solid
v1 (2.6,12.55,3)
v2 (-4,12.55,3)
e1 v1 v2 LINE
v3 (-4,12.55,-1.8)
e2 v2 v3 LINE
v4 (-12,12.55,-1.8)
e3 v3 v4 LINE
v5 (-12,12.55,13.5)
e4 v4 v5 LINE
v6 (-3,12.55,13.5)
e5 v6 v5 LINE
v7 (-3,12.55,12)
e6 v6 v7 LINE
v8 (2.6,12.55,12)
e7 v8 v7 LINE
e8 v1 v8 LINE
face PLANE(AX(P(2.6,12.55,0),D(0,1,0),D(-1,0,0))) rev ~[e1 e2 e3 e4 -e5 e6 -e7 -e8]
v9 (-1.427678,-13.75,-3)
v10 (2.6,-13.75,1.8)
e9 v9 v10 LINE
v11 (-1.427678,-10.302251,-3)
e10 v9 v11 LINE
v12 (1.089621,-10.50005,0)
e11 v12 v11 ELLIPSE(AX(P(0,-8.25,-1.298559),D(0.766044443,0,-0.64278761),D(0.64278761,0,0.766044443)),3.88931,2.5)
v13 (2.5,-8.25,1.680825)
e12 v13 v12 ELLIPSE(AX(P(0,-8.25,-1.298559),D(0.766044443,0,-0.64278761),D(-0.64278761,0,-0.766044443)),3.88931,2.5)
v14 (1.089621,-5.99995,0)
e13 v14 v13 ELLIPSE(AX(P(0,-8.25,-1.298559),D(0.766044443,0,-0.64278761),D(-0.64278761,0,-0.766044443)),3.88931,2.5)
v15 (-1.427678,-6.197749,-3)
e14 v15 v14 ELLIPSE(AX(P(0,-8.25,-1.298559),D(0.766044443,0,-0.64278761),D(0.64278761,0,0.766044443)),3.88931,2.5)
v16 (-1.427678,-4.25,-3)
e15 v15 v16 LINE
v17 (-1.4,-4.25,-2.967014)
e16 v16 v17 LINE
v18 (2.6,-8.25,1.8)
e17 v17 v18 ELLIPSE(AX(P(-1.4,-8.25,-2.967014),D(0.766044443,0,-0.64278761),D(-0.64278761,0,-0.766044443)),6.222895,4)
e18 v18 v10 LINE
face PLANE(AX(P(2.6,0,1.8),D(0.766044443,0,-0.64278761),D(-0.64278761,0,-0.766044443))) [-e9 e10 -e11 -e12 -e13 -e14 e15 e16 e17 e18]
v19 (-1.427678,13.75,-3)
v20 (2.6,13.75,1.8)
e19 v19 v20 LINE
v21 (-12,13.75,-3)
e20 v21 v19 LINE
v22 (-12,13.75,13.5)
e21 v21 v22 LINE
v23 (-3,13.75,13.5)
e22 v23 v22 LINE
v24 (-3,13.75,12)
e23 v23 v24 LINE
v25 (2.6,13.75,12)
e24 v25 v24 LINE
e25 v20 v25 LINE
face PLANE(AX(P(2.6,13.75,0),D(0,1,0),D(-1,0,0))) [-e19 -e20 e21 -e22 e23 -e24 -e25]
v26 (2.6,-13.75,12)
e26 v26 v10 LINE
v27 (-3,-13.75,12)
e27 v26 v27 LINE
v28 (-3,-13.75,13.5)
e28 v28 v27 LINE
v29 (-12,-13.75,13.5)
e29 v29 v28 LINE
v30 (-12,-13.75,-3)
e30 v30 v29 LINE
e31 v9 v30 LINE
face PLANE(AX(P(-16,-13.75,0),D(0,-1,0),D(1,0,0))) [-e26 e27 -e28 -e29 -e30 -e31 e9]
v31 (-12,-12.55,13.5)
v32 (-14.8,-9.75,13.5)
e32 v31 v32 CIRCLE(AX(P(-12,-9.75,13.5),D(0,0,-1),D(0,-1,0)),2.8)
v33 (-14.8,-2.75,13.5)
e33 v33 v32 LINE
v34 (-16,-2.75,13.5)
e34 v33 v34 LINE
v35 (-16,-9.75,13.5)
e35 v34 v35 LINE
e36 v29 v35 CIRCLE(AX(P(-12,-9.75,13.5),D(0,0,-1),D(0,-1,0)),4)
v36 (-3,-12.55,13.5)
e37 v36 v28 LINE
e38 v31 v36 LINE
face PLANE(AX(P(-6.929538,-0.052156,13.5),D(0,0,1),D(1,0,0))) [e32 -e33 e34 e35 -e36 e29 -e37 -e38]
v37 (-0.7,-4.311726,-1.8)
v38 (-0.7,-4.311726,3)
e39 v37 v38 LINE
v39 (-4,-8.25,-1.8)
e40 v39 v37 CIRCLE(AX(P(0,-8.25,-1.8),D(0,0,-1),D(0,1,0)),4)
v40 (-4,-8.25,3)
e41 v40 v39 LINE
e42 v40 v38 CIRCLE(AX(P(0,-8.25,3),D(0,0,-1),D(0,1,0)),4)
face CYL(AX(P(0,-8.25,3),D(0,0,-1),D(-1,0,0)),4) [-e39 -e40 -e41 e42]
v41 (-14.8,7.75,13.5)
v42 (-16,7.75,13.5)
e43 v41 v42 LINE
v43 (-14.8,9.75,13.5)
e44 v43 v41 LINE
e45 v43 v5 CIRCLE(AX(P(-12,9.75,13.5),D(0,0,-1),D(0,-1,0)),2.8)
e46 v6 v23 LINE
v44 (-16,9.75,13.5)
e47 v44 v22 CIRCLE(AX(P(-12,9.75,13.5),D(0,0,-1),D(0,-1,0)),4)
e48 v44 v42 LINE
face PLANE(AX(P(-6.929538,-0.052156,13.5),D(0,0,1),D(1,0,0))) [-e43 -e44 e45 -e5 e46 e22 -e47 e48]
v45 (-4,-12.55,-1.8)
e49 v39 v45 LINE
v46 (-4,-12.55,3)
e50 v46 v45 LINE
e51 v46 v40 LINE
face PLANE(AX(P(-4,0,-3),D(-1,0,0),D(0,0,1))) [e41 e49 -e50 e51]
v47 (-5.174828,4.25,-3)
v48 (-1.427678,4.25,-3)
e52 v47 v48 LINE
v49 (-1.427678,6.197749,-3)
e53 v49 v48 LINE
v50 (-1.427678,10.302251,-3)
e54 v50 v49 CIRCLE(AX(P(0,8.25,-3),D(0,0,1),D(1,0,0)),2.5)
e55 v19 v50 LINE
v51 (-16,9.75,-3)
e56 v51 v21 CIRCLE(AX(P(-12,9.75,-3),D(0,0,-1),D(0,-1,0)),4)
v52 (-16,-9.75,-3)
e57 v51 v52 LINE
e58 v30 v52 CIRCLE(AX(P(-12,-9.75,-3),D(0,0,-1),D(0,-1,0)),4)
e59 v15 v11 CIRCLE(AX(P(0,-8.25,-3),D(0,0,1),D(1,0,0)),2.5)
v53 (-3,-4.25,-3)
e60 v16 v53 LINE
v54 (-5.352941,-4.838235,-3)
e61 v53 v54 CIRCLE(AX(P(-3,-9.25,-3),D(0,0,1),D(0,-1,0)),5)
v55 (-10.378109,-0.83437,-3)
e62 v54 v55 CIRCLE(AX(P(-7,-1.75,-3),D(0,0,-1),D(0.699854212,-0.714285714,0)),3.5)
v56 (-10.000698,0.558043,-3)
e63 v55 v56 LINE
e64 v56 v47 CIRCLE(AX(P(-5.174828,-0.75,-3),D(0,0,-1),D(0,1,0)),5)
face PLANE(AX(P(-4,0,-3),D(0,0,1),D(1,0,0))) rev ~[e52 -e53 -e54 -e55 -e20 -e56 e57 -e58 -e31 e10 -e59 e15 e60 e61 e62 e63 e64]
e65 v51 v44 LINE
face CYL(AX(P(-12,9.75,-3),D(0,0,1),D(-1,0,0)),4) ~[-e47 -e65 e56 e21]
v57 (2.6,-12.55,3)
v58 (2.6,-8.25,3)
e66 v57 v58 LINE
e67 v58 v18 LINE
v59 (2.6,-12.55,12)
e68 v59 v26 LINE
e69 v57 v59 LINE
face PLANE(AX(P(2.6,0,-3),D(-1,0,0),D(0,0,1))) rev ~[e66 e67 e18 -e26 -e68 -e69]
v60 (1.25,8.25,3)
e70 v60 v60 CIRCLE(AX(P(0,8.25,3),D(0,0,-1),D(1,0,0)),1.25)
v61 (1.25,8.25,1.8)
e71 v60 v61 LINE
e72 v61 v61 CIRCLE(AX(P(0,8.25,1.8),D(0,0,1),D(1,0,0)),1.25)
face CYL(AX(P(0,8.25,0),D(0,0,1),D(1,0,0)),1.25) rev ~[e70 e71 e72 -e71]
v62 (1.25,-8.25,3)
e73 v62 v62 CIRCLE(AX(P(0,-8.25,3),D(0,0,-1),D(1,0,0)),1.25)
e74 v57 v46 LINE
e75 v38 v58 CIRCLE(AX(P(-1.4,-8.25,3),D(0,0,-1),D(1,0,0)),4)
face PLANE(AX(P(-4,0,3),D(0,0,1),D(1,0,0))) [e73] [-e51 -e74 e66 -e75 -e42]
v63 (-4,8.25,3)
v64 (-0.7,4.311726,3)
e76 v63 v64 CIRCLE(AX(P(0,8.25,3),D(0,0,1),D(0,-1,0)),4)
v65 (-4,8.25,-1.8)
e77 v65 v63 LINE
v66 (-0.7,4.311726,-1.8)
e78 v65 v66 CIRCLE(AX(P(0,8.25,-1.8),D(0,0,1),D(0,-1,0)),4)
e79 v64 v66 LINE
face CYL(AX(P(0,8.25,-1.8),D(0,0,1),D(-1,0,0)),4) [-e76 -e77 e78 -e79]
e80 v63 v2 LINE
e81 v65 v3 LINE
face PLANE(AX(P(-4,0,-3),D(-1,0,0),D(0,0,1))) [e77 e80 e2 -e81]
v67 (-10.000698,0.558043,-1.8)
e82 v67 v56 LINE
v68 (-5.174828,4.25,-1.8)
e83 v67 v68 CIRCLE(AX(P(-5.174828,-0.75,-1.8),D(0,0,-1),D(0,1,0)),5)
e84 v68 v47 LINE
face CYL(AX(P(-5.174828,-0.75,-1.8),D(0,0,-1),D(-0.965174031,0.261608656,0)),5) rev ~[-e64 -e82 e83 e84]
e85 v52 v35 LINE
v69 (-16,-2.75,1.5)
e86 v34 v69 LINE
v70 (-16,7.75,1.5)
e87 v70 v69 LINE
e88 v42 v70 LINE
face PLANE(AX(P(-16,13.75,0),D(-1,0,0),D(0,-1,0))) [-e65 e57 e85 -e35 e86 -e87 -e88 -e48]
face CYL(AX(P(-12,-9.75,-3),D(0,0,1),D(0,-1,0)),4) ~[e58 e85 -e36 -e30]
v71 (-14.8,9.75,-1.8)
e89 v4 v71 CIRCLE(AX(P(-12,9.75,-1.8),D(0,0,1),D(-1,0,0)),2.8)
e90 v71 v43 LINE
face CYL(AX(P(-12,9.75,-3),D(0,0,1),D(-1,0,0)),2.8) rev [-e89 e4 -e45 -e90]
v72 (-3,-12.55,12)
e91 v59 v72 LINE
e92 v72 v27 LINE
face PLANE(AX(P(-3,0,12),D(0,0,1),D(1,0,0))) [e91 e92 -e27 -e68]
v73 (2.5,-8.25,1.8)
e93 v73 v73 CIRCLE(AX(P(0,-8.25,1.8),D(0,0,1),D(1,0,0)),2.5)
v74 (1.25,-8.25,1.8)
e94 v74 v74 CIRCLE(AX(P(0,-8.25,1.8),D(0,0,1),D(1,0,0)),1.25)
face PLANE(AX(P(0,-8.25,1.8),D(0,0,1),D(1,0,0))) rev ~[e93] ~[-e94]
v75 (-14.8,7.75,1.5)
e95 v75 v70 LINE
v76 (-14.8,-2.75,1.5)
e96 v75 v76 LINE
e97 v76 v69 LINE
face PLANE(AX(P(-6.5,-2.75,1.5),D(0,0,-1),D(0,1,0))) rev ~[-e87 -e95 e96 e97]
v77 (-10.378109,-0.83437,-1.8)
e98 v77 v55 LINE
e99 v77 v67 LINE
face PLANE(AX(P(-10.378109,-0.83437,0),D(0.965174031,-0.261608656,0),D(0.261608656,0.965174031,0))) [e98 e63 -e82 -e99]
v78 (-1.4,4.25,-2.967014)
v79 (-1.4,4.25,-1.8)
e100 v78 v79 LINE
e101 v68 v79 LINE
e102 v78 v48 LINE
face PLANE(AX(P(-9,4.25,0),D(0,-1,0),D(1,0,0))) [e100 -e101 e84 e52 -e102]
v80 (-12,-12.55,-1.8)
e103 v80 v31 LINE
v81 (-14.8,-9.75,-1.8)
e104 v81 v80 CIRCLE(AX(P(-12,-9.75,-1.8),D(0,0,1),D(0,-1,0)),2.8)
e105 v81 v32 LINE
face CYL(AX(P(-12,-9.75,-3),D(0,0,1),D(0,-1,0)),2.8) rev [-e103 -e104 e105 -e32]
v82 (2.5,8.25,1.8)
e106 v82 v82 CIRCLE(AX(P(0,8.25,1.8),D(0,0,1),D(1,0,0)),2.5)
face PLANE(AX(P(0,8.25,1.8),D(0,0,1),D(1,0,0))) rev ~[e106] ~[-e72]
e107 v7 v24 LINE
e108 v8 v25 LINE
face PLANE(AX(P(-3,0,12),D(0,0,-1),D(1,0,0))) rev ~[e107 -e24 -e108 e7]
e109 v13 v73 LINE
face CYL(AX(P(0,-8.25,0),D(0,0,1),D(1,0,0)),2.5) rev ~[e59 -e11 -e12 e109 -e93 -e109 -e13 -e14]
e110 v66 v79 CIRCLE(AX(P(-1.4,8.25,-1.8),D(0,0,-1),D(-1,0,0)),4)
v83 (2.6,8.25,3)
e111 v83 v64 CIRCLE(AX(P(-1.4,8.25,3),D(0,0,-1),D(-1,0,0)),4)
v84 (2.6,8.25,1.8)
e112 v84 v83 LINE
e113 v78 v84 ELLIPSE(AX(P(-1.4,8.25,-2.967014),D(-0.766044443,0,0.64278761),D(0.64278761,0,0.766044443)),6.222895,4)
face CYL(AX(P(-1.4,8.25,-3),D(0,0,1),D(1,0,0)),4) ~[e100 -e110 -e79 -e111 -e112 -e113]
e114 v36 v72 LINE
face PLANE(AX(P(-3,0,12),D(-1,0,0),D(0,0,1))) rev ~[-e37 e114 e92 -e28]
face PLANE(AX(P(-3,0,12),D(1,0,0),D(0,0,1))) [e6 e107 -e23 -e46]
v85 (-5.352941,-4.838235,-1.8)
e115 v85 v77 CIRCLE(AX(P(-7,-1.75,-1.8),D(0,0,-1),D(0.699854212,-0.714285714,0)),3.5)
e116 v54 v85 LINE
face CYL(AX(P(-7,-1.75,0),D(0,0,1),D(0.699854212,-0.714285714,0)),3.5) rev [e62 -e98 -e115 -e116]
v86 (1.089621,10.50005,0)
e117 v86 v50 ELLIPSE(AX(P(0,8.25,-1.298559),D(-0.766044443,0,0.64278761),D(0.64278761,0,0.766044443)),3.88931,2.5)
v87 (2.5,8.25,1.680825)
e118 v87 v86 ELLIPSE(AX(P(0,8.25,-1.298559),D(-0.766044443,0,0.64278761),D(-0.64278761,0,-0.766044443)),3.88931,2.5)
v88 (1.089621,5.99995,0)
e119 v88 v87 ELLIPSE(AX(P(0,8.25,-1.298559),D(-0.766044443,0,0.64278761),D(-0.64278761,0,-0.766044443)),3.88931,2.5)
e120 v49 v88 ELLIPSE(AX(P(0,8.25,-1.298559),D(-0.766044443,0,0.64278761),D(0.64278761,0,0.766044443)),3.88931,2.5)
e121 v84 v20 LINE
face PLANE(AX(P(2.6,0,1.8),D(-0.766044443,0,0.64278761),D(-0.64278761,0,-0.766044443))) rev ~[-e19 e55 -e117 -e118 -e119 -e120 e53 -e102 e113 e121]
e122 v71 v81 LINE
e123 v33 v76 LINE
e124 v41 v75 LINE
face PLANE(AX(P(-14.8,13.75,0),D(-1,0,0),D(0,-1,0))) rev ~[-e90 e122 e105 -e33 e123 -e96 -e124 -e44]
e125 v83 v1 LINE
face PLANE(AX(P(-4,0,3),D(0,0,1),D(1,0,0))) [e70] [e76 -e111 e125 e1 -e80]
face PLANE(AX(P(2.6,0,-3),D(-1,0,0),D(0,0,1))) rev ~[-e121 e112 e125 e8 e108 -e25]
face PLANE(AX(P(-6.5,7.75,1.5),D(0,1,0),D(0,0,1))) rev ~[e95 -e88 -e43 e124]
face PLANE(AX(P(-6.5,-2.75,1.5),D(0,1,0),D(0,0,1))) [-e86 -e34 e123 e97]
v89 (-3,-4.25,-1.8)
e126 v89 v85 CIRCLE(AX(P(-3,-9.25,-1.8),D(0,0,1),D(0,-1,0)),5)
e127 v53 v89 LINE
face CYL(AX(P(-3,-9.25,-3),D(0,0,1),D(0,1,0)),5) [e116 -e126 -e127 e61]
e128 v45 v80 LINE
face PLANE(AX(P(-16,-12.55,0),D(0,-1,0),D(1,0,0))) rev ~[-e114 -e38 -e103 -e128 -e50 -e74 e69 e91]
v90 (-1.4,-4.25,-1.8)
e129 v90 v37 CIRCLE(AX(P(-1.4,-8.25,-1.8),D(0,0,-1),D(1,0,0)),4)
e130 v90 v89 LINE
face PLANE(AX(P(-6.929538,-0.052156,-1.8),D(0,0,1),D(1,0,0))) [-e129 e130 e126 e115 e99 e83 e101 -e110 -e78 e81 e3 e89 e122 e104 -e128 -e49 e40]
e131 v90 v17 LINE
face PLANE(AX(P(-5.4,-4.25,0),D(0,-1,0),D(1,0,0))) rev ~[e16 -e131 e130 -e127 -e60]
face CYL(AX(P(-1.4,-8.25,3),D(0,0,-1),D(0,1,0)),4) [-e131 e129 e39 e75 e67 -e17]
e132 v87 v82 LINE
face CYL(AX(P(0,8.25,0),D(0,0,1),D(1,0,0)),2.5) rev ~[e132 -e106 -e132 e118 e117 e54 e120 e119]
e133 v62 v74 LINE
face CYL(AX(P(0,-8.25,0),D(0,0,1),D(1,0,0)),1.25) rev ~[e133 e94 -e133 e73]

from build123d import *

# Parameters (mm, degrees)
F4_DEPTH       = 13.5
F4_DEPTH_BACK  = 3
F5_R           = 4
F6_T           = -1.2
F7_W           = 6.6
F7_H           = 6
F8_DEPTH       = 13.75
F8_DEPTH_BACK  = 13.75
F3_W           = 8
F3_H           = 8.5
F9_DEPTH       = 4.5
F9_DEPTH_BACK  = 4.3
F11_START      = -6.5
F10_W          = 10.5
F10_H          = 18.4398862173
F11_DEPTH      = 11.4
F12_F1_R       = 4
F12_F2_R       = 4
F12_F3_R       = 4
F12_F4_R       = 4
F0_R           = 1.25
F13_DEPTH      = 7.9
F13_DEPTH_BACK = 7.1
F1_R           = 2.5
F14_DEPTH      = 1.8
F14_DEPTH_BACK = 4.3
F15_R          = 5
F17_DEPTH      = 16
F17_DEPTH_BACK = 16.1
F18_W          = 5.6
F18_H          = 3
F19_DEPTH      = 25
F19_DEPTH_BACK = 25


# Not quite as in the source:
# - a feature names something its author has since deleted; it is built from what else it names


with BuildPart() as f4:
    # F2 (on Top) → F4 (new body, two sides)
    with BuildSketch(Plane.XY) as f4_sk:
        with BuildLine():
            Line((2.6, 4.25), (2.6, 13.75))
            Line((2.6, 13.75), (-16, 13.75))
            Line((-16, 13.75), (-16, -13.75))
            Line((-16, -13.75), (2.6, -13.75))
            Line((2.6, -13.75), (2.6, -4.25))
            Line((2.6, -4.25), (-4.5505102572, -4.25))
            ThreePointArc((-4.5505102572, -4.25), (-8.769806787, -4.7695668459), (-10.3781091101, -0.8343697034))
            Line((-10.3781091101, -0.8343697034), (-9, 4.25))
            Line((-9, 4.25), (2.6, 4.25))
        make_face()
    extrude(amount=F4_DEPTH)
    extrude(f4_sk.sketch, amount=-F4_DEPTH_BACK)

    # F5
    f5_edges = [f4.edges().sort_by_distance(p)[0] for p in [
        (-16, 13.75, 5.25),
        (-16, -13.75, 5.25),
    ]]
    fillet(f5_edges, radius=F5_R)

    # F6
    f6_openings = [f4.faces().sort_by_distance(p)[0] for p in [
        (-4.7, 13.418005, 13.5),
        (2.6, 9, 5.25),
        (2.6, -9, 5.25),
        (-0.975255, -4.25, 5.25),
        (-3.2, 4.25, 5.25),
        (-8.769807, -4.769567, 5.25),
        (-9.689055, 1.707815, 5.25),
    ]]
    offset(amount=F6_T, openings=f6_openings)

    # F7 (on Front) → F8 (join, two sides)
    with BuildSketch(Plane.XZ) as f8_sk:
        with Locations((-0.7, 0)):
            Rectangle(F7_W, F7_H)
    extrude(amount=-F8_DEPTH)
    extrude(f8_sk.sketch, amount=F8_DEPTH_BACK)

    # F3 (on Top) → F9 (cut, two sides)
    with BuildSketch(Plane.XY) as f9_sk:
        with Locations((-1.4, 0)):
            Rectangle(F3_W, F3_H)
    extrude(amount=F9_DEPTH, mode=Mode.SUBTRACT)
    extrude(f9_sk.sketch, amount=-F9_DEPTH_BACK, mode=Mode.SUBTRACT)

    # F10 (on Right) → F11 (cut)
    with BuildSketch(Plane.YZ.offset(F11_START)):
        with Locations((2.5, 10.7199431086)):
            Rectangle(F10_W, F10_H)
    extrude(amount=-F11_DEPTH, mode=Mode.SUBTRACT)

    # F12: fillet of radius 4 on 4 edges, made by hand

    # F12_f1
    f12_f1_edges = [f4.edges().sort_by_distance(p)[0] for p in [
        (-4, -4.25, 0.6),
    ]]
    fillet(f12_f1_edges, radius=F12_F1_R)

    # F12_f2
    f12_f2_edges = [f4.edges().sort_by_distance(p)[0] for p in [
        (-4, 4.25, 0.6),
    ]]
    fillet(f12_f2_edges, radius=F12_F2_R)

    # F12_f3
    f12_f3_edges = [f4.edges().sort_by_distance(p)[0] for p in [
        (2.6, 4.25, 0),
    ]]
    fillet(f12_f3_edges, radius=F12_F3_R)

    # F12_f4
    f12_f4_edges = [f4.edges().sort_by_distance(p)[0] for p in [
        (2.6, -4.25, 0),
    ]]
    fillet(f12_f4_edges, radius=F12_F4_R)

    # F0 (on Top) → F13 (cut, two sides)
    with BuildSketch(Plane.XY) as f13_sk:
        with Locations((0, -8.25)):
            Circle(F0_R)
        with Locations((0, 8.25)):
            Circle(F0_R)
    extrude(amount=F13_DEPTH, mode=Mode.SUBTRACT)
    extrude(f13_sk.sketch, amount=-F13_DEPTH_BACK, mode=Mode.SUBTRACT)

    # F1 (on Top) → F14 (cut, two sides)
    with BuildSketch(Plane.XY) as f14_sk:
        with Locations((0, -8.25)):
            Circle(F1_R)
        with Locations((0, 8.25)):
            Circle(F1_R)
    extrude(amount=F14_DEPTH, mode=Mode.SUBTRACT)
    extrude(f14_sk.sketch, amount=-F14_DEPTH_BACK, mode=Mode.SUBTRACT)

    # F15
    f15_edges = [f4.edges().sort_by_distance(p)[0] for p in [
        (-4.55051, -4.25, -2.4),
        (-9, 4.25, -2.4),
    ]]
    fillet(f15_edges, radius=F15_R)

    # F16 (on Front) → F17 (cut, two sides)
    with BuildSketch(Plane.XZ) as f17_sk:
        Polygon((2.6, 1.8), (-4.0077234488, -6.074778159), (2.3954068281, -10.9375437775), (8.7053719483, -6.2603745918), align=None)
    extrude(amount=F17_DEPTH, mode=Mode.SUBTRACT)
    extrude(f17_sk.sketch, amount=-F17_DEPTH_BACK, mode=Mode.SUBTRACT)

    # F18 (on Front) → F19 (cut, two sides)
    with BuildSketch(Plane.XZ) as f19_sk:
        with Locations((-0.2, 13.5)):
            Rectangle(F18_W, F18_H)
    extrude(amount=F19_DEPTH, mode=Mode.SUBTRACT)
    extrude(f19_sk.sketch, amount=-F19_DEPTH_BACK, mode=Mode.SUBTRACT)


solid = f4.part
